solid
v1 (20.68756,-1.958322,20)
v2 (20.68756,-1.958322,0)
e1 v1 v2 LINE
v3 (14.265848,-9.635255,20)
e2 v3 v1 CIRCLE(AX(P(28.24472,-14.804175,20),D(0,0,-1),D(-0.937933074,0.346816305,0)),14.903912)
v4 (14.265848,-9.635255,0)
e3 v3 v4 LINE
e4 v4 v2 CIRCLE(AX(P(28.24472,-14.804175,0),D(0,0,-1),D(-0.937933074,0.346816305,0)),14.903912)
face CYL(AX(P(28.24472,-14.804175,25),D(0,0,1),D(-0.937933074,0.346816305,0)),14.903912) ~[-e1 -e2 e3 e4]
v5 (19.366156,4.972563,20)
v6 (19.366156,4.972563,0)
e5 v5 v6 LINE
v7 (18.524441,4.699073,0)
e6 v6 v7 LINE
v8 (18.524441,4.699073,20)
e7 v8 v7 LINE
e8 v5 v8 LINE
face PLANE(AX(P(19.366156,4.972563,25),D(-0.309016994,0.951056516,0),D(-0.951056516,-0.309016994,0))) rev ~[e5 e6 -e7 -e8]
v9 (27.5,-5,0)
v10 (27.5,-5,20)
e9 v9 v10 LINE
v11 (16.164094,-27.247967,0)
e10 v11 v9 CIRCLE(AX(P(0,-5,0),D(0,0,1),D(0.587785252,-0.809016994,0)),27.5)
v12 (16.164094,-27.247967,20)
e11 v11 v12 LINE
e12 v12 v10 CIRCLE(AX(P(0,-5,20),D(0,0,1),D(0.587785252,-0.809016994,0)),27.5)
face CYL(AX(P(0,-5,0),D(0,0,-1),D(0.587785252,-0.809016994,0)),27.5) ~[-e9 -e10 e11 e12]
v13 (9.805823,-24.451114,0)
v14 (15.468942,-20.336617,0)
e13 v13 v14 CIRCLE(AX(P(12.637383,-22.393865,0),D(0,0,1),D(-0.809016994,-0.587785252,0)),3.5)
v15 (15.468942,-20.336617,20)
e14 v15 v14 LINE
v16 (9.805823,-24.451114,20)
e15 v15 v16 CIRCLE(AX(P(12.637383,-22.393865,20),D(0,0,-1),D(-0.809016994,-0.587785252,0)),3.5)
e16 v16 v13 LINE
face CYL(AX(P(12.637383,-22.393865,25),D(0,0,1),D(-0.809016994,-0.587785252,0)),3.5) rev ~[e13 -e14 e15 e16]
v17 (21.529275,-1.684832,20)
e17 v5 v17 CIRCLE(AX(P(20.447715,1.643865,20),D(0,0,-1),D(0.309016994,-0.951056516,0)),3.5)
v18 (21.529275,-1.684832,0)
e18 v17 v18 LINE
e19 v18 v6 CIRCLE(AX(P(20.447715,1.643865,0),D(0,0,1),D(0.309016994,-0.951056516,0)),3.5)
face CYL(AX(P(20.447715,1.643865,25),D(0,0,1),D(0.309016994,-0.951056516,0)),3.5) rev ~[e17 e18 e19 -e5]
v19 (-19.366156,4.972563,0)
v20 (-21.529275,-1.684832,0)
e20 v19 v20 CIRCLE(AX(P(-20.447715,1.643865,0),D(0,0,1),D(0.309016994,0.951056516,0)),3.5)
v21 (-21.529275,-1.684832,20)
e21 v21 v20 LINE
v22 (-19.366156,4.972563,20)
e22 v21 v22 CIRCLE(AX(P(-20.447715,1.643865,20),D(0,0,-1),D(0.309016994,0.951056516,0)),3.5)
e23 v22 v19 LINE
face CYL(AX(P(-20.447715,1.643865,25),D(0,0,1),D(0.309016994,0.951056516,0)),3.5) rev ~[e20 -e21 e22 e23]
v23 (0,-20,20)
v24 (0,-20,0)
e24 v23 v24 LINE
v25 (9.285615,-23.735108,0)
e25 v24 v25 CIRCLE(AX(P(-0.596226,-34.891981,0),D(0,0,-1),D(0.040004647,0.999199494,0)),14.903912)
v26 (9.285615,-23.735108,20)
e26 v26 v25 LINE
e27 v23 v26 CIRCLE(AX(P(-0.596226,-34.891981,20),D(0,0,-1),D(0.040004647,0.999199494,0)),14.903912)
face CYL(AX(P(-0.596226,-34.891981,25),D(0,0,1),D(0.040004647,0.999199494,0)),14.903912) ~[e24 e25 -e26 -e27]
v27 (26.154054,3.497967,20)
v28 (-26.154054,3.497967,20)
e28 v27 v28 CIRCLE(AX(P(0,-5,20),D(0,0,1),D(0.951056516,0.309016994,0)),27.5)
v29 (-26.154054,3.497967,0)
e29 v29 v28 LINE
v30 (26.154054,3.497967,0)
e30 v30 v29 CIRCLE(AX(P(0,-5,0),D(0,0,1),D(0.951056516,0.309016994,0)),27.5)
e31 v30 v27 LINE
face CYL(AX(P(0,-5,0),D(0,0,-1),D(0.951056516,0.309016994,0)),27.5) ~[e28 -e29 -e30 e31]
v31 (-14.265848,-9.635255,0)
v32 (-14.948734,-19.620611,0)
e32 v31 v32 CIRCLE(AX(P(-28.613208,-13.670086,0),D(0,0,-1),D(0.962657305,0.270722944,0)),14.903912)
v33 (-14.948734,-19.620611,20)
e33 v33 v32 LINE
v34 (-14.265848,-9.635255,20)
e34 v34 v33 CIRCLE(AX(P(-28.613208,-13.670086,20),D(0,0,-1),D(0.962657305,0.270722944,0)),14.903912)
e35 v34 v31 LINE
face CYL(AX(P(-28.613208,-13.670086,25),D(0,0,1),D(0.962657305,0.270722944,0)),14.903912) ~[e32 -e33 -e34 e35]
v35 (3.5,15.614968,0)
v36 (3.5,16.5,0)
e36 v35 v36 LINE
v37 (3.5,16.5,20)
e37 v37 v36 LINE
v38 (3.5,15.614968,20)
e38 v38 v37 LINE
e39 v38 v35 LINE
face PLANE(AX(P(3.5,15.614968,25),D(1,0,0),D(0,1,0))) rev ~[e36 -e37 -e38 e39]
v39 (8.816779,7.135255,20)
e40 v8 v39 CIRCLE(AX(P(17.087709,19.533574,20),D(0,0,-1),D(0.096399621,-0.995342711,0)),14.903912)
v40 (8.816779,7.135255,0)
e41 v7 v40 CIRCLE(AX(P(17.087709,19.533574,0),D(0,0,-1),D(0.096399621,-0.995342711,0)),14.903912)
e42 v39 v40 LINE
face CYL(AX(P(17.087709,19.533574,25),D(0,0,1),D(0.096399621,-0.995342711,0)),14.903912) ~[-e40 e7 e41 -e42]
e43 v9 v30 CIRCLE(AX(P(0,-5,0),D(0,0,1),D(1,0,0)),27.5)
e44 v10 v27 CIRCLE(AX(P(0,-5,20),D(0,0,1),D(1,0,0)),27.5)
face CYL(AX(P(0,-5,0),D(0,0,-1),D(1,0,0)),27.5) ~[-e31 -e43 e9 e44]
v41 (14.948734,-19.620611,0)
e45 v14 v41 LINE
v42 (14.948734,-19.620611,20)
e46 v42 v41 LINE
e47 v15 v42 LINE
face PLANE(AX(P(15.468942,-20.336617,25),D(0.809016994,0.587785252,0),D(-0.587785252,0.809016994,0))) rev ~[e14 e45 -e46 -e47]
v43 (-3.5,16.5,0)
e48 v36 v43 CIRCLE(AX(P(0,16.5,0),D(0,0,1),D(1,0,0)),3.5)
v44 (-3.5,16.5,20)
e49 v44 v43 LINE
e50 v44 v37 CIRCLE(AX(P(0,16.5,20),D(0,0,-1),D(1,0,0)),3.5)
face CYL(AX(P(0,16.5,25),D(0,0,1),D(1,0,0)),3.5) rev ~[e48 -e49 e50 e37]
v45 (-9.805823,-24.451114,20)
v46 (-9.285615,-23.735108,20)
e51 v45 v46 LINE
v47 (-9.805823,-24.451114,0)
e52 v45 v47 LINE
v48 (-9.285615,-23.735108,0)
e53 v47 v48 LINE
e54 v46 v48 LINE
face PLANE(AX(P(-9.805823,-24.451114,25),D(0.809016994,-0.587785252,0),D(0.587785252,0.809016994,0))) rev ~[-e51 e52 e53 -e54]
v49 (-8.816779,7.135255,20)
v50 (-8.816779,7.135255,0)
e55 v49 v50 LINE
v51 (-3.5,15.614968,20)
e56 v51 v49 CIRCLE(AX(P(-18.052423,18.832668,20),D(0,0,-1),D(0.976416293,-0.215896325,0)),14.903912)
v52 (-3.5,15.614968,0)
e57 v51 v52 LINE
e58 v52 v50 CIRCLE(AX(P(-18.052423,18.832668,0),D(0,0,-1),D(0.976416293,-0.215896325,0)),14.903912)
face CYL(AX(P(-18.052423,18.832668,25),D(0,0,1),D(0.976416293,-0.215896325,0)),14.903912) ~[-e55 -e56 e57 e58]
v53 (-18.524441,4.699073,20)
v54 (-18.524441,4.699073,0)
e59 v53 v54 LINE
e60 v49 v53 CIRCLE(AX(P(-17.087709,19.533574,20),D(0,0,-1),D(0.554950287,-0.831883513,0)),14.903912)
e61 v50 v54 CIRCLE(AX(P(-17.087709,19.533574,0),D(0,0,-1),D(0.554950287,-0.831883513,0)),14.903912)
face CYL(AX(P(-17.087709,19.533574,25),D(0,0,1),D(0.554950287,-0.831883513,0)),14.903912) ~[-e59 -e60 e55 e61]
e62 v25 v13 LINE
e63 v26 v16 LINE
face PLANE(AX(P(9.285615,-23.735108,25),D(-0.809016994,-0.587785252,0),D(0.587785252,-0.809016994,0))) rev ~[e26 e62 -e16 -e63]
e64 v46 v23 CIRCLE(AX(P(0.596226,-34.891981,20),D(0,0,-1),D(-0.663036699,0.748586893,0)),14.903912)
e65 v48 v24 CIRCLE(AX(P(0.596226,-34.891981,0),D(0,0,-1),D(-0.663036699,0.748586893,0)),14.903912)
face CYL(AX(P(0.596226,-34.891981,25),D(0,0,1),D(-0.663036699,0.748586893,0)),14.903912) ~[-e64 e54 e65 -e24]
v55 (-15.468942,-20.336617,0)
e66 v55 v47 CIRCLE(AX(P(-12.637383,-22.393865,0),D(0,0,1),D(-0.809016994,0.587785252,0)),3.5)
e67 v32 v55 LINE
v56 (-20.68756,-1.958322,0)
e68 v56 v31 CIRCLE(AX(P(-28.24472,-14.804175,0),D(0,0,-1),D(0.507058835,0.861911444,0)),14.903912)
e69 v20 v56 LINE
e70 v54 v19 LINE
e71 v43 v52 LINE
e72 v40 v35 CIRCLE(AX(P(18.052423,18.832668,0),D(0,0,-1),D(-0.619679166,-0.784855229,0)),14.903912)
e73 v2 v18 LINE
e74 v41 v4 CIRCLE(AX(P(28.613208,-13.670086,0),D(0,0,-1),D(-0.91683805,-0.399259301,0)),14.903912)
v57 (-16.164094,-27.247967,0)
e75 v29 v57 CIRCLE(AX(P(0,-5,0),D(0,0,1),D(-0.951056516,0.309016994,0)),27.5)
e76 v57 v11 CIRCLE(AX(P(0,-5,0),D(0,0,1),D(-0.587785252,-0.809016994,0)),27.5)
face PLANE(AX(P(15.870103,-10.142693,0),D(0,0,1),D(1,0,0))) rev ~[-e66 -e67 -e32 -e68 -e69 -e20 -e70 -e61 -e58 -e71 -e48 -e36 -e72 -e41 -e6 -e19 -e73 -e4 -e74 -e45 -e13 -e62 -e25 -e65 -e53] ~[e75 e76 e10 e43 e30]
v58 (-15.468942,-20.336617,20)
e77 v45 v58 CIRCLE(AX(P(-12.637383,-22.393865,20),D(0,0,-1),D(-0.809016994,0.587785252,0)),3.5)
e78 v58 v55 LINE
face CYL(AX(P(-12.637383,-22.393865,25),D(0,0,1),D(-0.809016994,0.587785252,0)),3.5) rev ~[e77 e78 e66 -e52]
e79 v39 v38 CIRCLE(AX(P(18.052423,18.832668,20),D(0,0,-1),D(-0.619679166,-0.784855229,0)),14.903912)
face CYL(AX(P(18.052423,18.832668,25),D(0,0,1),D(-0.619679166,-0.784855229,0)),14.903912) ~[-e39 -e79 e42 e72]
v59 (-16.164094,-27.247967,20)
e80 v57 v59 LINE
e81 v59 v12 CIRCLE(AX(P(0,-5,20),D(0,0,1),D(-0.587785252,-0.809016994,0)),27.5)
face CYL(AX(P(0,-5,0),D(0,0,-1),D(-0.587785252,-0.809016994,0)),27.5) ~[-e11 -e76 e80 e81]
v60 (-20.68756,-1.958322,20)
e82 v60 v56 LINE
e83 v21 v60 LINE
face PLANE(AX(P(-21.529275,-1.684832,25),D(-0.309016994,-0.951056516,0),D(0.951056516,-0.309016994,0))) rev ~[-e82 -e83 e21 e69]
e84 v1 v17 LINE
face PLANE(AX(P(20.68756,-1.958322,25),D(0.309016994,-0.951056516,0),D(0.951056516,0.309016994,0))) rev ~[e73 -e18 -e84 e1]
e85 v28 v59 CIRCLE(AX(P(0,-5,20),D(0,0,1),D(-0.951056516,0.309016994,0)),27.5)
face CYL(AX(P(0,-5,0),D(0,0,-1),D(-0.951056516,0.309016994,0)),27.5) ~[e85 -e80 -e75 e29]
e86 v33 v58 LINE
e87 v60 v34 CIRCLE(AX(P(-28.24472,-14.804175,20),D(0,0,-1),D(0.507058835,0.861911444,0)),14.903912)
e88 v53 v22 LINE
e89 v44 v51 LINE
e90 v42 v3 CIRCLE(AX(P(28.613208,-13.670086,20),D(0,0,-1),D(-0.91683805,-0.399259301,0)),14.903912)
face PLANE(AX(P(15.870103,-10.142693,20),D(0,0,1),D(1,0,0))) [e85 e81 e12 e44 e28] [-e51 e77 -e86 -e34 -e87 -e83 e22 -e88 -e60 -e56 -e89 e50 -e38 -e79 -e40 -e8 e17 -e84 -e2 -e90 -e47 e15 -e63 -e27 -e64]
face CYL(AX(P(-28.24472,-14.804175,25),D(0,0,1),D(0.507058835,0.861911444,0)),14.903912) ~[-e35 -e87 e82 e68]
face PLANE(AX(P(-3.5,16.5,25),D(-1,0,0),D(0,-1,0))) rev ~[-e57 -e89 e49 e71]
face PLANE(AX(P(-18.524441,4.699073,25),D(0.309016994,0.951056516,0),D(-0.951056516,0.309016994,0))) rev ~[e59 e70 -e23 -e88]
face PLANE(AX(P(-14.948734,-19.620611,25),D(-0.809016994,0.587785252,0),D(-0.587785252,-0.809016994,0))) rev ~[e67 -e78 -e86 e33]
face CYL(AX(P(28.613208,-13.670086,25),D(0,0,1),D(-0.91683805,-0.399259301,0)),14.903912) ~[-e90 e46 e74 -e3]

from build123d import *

# Parameters (mm, degrees)
F2_DEPTH = 25
F3_DEPTH = 20
F4_DEPTH = 25


with BuildPart() as f2:
    # F1 (on Top) → F2 (new body)
    with BuildSketch(Plane.XY):
        with BuildLine():
            ThreePointArc((-8.8167787844, 7.1352549156), (-13.4599944512, 5.0779075669), (-18.5244405716, 4.6990733883))
            Line((-18.5244405716, 4.6990733883), (-19.36615562, 4.9725631861))
            ThreePointArc((-19.36615562, 4.9725631861), (-23.7764129074, 2.7254248594), (-21.5292745807, -1.684832428))
            Line((-21.5292745807, -1.684832428), (-20.6875595323, -1.9583222258))
            ThreePointArc((-20.6875595323, -1.9583222258), (-16.813009697, -5.241612255), (-14.2658477444, -9.6352549156))
            ThreePointArc((-14.2658477444, -9.6352549156), (-13.7440266917, -14.6869707262), (-14.9487338959, -19.6206114097))
            Line((-14.9487338959, -19.6206114097), (-15.4689424046, -20.336616996))
            ThreePointArc((-15.4689424046, -20.336616996), (-14.6946313073, -25.2254248594), (-9.805823444, -24.4511137621))
            Line((-9.805823444, -24.4511137621), (-9.2856149352, -23.7351081758))
            ThreePointArc((-9.2856149352, -23.7351081758), (-4.9657188134, -21.0647847237), (0, -20))
            ThreePointArc((0, -20), (4.9657188134, -21.0647847237), (9.2856149352, -23.7351081758))
            Line((9.2856149352, -23.7351081758), (9.805823444, -24.4511137621))
            ThreePointArc((9.805823444, -24.4511137621), (14.6946313073, -25.2254248594), (15.4689424046, -20.336616996))
            Line((15.4689424046, -20.336616996), (14.9487338959, -19.6206114097))
            ThreePointArc((14.9487338959, -19.6206114097), (13.7440266917, -14.6869707262), (14.2658477444, -9.6352549156))
            ThreePointArc((14.2658477444, -9.6352549156), (16.813009697, -5.241612255), (20.6875595323, -1.9583222258))
            Line((20.6875595323, -1.9583222258), (21.5292745807, -1.684832428))
            ThreePointArc((21.5292745807, -1.684832428), (23.7764129074, 2.7254248594), (19.36615562, 4.9725631861))
            Line((19.36615562, 4.9725631861), (18.5244405716, 4.6990733883))
            ThreePointArc((18.5244405716, 4.6990733883), (13.4599944512, 5.0779075669), (8.8167787844, 7.1352549156))
            ThreePointArc((8.8167787844, 7.1352549156), (5.4252926325, 10.915460138), (3.5, 15.614968423))
            Line((3.5, 15.614968423), (3.5, 16.5))
            ThreePointArc((3.5, 16.5), (0, 20), (-3.5, 16.5))
            Line((-3.5, 16.5), (-3.5, 15.614968423))
            ThreePointArc((-3.5, 15.614968423), (-5.4252926325, 10.915460138), (-8.8167787844, 7.1352549156))
        make_face()
    extrude(amount=F2_DEPTH)

    # F0 (on Top) → F3 (join)
    with BuildSketch(Plane.XY):
        with BuildLine():
            ThreePointArc((16.164094438, -27.2479673453), (24.5026794152, -17.4847387428), (27.5, -5))
            ThreePointArc((27.5, -5), (27.1614293664, -0.6980522114), (26.1540541981, 3.4979673453))
            Line((26.1540541981, 3.4979673453), (23.7764129074, 2.7254248594))
            Line((23.7764129074, 2.7254248594), (0, -5))
            Line((0, -5), (14.6946313073, -25.2254248594))
            Line((14.6946313073, -25.2254248594), (16.164094438, -27.2479673453))
        make_face()
        with BuildLine():
            Line((23.7764129074, 2.7254248594), (26.1540541981, 3.4979673453))
            ThreePointArc((26.1540541981, 3.4979673453), (0, 22.5), (-26.1540541981, 3.4979673453))
            Line((-26.1540541981, 3.4979673453), (-23.7764129074, 2.7254248594))
            Line((-23.7764129074, 2.7254248594), (0, -5))
            Line((0, -5), (23.7764129074, 2.7254248594))
        make_face()
        with BuildLine():
            ThreePointArc((-16.164094438, -27.2479673453), (0, -32.5), (16.164094438, -27.2479673453))
            Line((16.164094438, -27.2479673453), (14.6946313073, -25.2254248594))
            Line((14.6946313073, -25.2254248594), (0, -5))
            Line((0, -5), (-14.6946313073, -25.2254248594))
            Line((-14.6946313073, -25.2254248594), (-16.164094438, -27.2479673453))
        make_face()
        with BuildLine():
            Line((-23.7764129074, 2.7254248594), (-26.1540541981, 3.4979673453))
            ThreePointArc((-26.1540541981, 3.4979673453), (-26.1540541981, -13.4979673453), (-16.164094438, -27.2479673453))
            Line((-16.164094438, -27.2479673453), (-14.6946313073, -25.2254248594))
            Line((-14.6946313073, -25.2254248594), (0, -5))
            Line((0, -5), (-23.7764129074, 2.7254248594))
        make_face()
    extrude(amount=F3_DEPTH)

    # F4 (cut): a face of the model
    f4_faces = [f2.faces().sort_by_distance(p)[0] for p in [
        (0, -5, 25),
    ]]
    extrude(f4_faces, amount=-F4_DEPTH, mode=Mode.SUBTRACT)


solid = f2.part
